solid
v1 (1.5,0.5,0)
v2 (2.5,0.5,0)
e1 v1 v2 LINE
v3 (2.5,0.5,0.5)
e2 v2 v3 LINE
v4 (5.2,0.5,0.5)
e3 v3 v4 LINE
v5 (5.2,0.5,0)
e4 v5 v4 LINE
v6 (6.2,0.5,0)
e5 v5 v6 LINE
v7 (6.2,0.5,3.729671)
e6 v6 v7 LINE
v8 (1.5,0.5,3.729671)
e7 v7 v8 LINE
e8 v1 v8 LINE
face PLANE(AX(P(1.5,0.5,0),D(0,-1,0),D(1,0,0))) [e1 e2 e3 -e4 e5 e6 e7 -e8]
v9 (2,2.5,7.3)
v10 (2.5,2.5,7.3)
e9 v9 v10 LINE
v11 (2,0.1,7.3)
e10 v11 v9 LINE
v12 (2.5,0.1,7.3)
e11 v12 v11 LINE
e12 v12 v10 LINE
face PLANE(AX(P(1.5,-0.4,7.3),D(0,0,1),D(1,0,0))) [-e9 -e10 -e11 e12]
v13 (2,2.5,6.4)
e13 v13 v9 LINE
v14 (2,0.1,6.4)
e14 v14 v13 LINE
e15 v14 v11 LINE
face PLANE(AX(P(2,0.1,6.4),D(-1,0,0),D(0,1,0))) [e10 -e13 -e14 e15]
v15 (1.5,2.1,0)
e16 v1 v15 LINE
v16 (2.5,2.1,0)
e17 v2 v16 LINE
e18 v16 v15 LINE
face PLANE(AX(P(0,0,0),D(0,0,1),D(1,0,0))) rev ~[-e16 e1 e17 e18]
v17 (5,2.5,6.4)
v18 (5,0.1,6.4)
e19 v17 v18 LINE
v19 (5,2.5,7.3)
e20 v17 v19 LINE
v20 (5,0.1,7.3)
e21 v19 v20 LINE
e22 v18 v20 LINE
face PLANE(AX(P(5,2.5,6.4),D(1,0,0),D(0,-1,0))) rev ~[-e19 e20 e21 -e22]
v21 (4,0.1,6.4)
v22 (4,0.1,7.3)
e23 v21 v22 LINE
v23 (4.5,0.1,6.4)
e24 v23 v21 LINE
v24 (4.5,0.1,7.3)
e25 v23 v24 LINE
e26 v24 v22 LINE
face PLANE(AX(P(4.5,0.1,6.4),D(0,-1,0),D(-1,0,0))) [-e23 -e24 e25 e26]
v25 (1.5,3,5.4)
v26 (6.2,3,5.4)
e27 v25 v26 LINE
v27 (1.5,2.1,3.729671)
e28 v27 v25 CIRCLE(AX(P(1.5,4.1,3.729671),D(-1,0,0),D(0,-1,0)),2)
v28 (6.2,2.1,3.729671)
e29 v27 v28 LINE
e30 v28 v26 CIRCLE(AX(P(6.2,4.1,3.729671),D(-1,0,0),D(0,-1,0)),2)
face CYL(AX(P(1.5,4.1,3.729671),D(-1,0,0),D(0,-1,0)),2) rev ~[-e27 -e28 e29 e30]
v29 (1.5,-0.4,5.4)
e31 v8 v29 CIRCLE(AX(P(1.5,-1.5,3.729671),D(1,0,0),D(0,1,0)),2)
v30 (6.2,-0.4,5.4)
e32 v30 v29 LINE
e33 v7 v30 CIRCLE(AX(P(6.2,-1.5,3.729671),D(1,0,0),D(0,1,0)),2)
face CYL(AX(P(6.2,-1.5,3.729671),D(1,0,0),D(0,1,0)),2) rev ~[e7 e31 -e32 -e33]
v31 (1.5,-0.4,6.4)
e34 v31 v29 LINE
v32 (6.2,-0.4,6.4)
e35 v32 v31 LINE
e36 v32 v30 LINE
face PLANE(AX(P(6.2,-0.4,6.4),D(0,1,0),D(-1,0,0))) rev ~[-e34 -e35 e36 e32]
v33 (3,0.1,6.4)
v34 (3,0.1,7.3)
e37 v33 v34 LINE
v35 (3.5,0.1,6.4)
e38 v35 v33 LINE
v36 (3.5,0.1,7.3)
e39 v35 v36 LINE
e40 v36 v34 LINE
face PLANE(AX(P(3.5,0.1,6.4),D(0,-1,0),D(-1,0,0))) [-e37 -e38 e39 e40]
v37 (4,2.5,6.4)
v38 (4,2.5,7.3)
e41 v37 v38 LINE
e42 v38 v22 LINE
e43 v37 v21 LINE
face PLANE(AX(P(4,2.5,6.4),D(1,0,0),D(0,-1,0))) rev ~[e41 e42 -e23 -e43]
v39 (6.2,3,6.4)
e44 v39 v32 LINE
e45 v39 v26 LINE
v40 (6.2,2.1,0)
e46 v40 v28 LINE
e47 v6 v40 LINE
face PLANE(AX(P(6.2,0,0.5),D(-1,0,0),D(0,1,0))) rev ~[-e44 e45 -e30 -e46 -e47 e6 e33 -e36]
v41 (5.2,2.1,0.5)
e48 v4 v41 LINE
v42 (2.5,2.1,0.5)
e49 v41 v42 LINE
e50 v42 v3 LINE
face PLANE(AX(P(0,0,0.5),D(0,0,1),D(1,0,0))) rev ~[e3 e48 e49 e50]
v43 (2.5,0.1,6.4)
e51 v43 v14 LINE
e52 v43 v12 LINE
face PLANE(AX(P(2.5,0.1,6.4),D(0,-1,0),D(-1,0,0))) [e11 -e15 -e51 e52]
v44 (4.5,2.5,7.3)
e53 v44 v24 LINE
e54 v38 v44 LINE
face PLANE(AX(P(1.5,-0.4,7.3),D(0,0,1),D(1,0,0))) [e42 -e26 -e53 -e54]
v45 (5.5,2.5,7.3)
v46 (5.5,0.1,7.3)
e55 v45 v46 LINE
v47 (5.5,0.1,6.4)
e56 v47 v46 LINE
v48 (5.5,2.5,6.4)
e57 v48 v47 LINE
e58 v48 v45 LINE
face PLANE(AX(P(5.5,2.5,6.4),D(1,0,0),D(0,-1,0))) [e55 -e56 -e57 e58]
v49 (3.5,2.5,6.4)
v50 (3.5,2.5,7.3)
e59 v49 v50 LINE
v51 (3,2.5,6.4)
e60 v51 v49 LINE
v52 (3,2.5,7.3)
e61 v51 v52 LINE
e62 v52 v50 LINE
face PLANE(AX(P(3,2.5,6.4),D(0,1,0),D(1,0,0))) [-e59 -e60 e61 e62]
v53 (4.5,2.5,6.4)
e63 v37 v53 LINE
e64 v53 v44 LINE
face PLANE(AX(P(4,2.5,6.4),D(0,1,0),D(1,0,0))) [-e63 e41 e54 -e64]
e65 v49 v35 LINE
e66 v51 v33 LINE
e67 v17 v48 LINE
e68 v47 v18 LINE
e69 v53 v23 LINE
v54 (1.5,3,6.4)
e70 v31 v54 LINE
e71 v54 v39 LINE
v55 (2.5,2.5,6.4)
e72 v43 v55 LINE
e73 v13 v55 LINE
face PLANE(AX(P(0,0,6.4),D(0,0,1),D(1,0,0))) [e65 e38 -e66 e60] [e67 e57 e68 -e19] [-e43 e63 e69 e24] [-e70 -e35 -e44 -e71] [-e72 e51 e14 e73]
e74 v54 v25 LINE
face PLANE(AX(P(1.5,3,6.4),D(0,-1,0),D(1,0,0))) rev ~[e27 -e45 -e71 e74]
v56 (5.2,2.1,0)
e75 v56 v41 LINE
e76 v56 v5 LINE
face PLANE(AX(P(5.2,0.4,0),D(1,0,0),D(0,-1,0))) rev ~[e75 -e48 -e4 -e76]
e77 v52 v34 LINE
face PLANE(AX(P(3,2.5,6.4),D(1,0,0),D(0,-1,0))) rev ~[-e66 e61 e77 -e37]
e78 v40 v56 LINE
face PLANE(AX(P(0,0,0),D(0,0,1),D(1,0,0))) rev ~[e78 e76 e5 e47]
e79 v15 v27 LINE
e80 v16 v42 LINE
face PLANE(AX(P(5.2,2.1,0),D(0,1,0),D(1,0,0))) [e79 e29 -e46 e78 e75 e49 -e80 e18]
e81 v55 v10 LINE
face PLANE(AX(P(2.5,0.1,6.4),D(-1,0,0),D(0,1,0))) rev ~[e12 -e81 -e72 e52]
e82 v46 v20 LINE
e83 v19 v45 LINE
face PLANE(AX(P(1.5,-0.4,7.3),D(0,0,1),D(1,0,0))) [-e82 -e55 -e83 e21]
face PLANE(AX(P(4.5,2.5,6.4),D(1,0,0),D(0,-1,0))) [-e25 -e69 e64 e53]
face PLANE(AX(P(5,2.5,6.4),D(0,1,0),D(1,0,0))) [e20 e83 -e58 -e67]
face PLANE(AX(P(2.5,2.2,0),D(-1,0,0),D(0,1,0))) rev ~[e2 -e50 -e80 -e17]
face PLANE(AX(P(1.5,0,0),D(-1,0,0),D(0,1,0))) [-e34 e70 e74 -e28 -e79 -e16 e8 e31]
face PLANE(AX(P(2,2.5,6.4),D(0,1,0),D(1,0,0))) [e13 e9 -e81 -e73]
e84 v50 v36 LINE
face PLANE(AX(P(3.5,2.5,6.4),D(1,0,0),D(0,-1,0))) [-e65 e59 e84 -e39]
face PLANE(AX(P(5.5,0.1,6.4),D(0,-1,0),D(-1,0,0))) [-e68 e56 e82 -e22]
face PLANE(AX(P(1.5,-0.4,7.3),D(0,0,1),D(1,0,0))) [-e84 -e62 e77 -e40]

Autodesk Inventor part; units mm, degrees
ref_plane "YZ Plane" through (0, 0, 0) normal (1, 0, 0) x (0, 1, 0)
ref_plane "XZ Plane" through (0, 0, 0) normal (0, 1, 0) x (-1, 0, 0)
sketch "Szkic1" plane through (0, 0, 0) normal (0, 0, 1) x (1, 0, 0)
  line L0 (2.7, 2.2) -> (2.7, 0.4) projected
  line L1 (5, 0.4) -> (5, 2.2) projected
  line L2 (5, 2.2) -> (5, 2.6) projected
  line L3 (2.7, 2.6) -> (2.7, 2.2) projected
  line L4 (2.7, 0.4) -> (2.7, 0) projected
  line L5 (5, 0) -> (5, 0.4) projected
  line L6 (2.7, 0) -> (5, 0) projected
  line L7 (5, 2.6) -> (2.7, 2.6) projected
  line L8 (2.5, -0.2) -> (2.5, 0.4)
  line L9 (2.5, 0.4) -> (2.5, 2.2)
  line L10 (2.5, 2.2) -> (2.5, 2.8)
  line L11 (2.5, 2.8) -> (5.2, 2.8)
  line L12 (5.2, 2.8) -> (5.2, 2.2)
  line L13 (5.2, 2.2) -> (5.2, 0.4)
  line L14 (5.2, 0.4) -> (5.2, -0.2)
  line L15 (5.2, -0.2) -> (2.5, -0.2)
  line L16 (2.7, 0) -> (2.7, 2.6) projected
  line L17 (0, 2.6) -> (2.7, 2.6) projected
  line L18 (0, 0) -> (0, 2.6) projected
  line L19 (0, 0) -> (2.7, 0) projected
  line L20 (5, 2.6) -> (5, 0) projected
  line L21 (5, 0) -> (10, 0) projected
  line L22 (10, 0) -> (10, 2.6) projected
  line L23 (5, 2.6) -> (10, 2.6) projected
  line L24 (2.5, 0) -> (1.5, 0)
  line L25 (1.5, 0) -> (1.5, 2.6)
  line L26 (1.5, 2.6) -> (2.5, 2.6)
  line L27 (2.5, 2.6) -> (2.5, 0)
  line L28 (5.2, 0) -> (6.2, 0)
  line L29 (6.2, 0) -> (6.2, 2.6)
  line L30 (6.2, 2.6) -> (5.2, 2.6)
  line L31 (5.2, 2.6) -> (5.2, 0)
  dimension "d0" = 0.2
  dimension "d1" = 1
  dimension "d2" = 1
extrude "Wyciągnięcie proste1" add sketch "Szkic1" along normal blind 0.5 contours L10 L9 L8 L19 L25 L17 | L23 L29 L21 L14 L13 L12
sketch "Szkic2" plane through (0, 0, 0.5) normal (0, 0, 1) x (1, 0, 0)
  line L0 (1.5, 0) -> (2.5, 0) projected
  line L1 (2.5, 0) -> (2.5, 2.6) projected
  line L2 (2.5, 2.6) -> (1.5, 2.6) projected
  line L3 (1.5, 2.6) -> (1.5, 0) projected
  line L4 (6.2, 2.6) -> (5.2, 2.6) projected
  line L5 (5.2, 2.6) -> (5.2, 0) projected
  line L6 (5.2, 0) -> (6.2, 0) projected
  line L7 (6.2, 0) -> (6.2, 2.6) projected
  line L8 (1.5, 2.6) -> (6.2, 2.6)
  line L9 (6.2, 2.6) -> (6.2, 0)
  line L10 (6.2, 0) -> (1.5, 0)
  line L11 (1.5, 0) -> (1.5, 2.6)
  point P0 (0, 0)
ref_plane "Płaszczyzna konstrukcyjna1" through (-1, -0.5, 6.4) normal (0, 0, -1) x (0, 1, 0)
extrude "Wyciągnięcie proste2" add sketch "Szkic2" along normal up to surface (5.9 mm away)
sketch "Szkic3" plane through (1.5, 0, 6.4) normal (0, 0, 1) x (1, 0, 0)
  line L0 (9.5, 3.1) -> (-2.5, 3.1) projected
  line L1 (-2.5, 3.1) -> (-2.5, -0.5) projected
  line L2 (-2.5, -0.5) -> (9.5, -0.5) projected
  line L3 (9.5, -0.5) -> (9.5, 3.1) projected
  line L4 (0, 2.6) -> (0, 0) projected
  line L5 (0, 0) -> (4.7, 0) projected
  line L6 (4.7, 0) -> (4.7, 2.6) projected
  line L7 (4.7, 2.6) -> (0, 2.6) projected
  line L8 (0, 3.1) -> (4.7, 3.1)
  line L9 (4.7, 3.1) -> (4.7, -0.5)
  line L10 (4.7, -0.5) -> (0, -0.5)
  line L11 (0, -0.5) -> (0, 3.1)
  line L12 (-2.4, 3) -> (9.4, 3)
  line L13 (9.4, 3) -> (9.4, -0.4)
  line L14 (9.4, -0.4) -> (-2.4, -0.4)
  line L15 (-2.4, -0.4) -> (-2.4, 3)
  point P0 (-1.5, 0)
  point P1 (4.7, 3)
  point P2 (0, 3)
  point P3 (0, -0.4)
  point P4 (4.7, -0.4)
  dimension "d7" = 0.1
extrude "Wyciągnięcie proste3" add sketch "Szkic3" against normal blind 1 contours L9 L7 L11 L12 | L6 L5 L4 L7 | L14 L11 L5 L9
sketch "Szkic4" plane through (1.5, -0.4, 6.4) normal (0, 0, 1) x (1, 0, 0)
  line L0 (-2.2, 3.2) -> (9.2, 3.2) projected
  line L1 (9.2, 0.2) -> (-2.2, 0.2) projected
  line L2 (-2.2, 0.2) -> (-2.2, 3.2) projected
  line L3 (9.2, 3.2) -> (9.2, 0.2) projected
  line L4 (0, 3.4) -> (0, 0) projected
  line L5 (0, 0) -> (4.7, 0) projected
  line L6 (4.7, 0) -> (4.7, 3.4) projected
  line L7 (4.7, 3.4) -> (0, 3.4) projected
  line L8 (0.5, 0.5) -> (0.5, 2.9)
  line L9 (0.5, 2.9) -> (4.2, 2.9)
  line L10 (4.2, 2.9) -> (4.2, 0.5)
  line L11 (4.2, 0.5) -> (0.5, 0.5)
  line L12 (1, 0.4) -> (1, 3) projected
  line L13 (0.5, 2.9) -> (1, 2.9)
  line L14 (1, 2.9) -> (1, 0.5)
  line L15 (1, 0.5) -> (0.5, 0.5)
  line L16 (0.5, 0.5) -> (0.5, 2.9)
  line L17 (1.5, 2.9) -> (1.5, 0.5)
  line L18 (2, 2.9) -> (2, 0.5)
  line L19 (2.5, 2.9) -> (2.5, 0.5)
  line L20 (3, 2.9) -> (3, 0.5)
  line L21 (3.5, 2.9) -> (3.5, 0.5)
  line L22 (4, 2.9) -> (4, 0.5)
  point P0 (-1.5, 0.4)
  point P1 (4, 0.5)
  point P2 (4, 2.9)
  point P3 (3.5, 2.9)
  point P4 (3.5, 0.5)
  point P5 (3, 0.5)
  point P6 (3, 2.9)
  point P7 (2.5, 0.5)
  point P8 (2, 0.5)
  point P9 (1.5, 2.9)
  point P10 (1.5, 0.5)
  point P11 (1, 2.9)
  dimension "d10" = 0.5
  dimension "d13" = 0.5
extrude "Wyciągnięcie proste4" add sketch "Szkic4" along normal blind 0.9 contours L8 L9 L12 L11 | L17 L9 L18 L11 | L19 L9 L20 L11 | L21 L9 L22 L11
sketch "Szkic5" plane through (1.5, 0, 0) normal (0, -1, 0) x (1, 0, 0)
  line L0 (4.7, 5.4) -> (0, 5.4) projected
  line L1 (0, 0) -> (0, 5.4) projected
  line L2 (0, 0) -> (1, 0) projected
  line L3 (1, 0) -> (1, 0.5) projected
  line L4 (1, 0.5) -> (3.7, 0.5) projected
  line L5 (3.7, 0) -> (3.7, 0.5) projected
  line L6 (3.7, 0) -> (4.7, 0) projected
  line L7 (4.7, 0) -> (4.7, 5.4) projected
  point P0 (-1.5, 0)
extrude "Wyciągnięcie proste5" cut sketch "Szkic5" against normal blind 0.5
sketch "Szkic6" plane through (5.2, 2.6, 0) normal (0, 1, 0) x (1, 0, 0)
  line L0 (-3.7, -5.4) -> (1, -5.4) projected
  line L1 (1, 0) -> (1, -5.4) projected
  line L2 (1, 0) -> (0, 0) projected
  line L3 (0, 0) -> (0, -0.5) projected
  line L4 (0, -0.5) -> (-2.7, -0.5) projected
  line L5 (-2.7, 0) -> (-2.7, -0.5) projected
  line L6 (-2.7, 0) -> (-3.7, 0) projected
  line L7 (-3.7, 0) -> (-3.7, -5.4) projected
  point P0 (-5.2, 0)
extrude "Wyciągnięcie proste6" cut sketch "Szkic6" against normal blind 0.5
fillet "Zaokrąglenie1" radius 2 2 edges at (3.85, 2.1, 5.4) (3.85, 0.5, 5.4)
properties part number "wlacznik_2"
